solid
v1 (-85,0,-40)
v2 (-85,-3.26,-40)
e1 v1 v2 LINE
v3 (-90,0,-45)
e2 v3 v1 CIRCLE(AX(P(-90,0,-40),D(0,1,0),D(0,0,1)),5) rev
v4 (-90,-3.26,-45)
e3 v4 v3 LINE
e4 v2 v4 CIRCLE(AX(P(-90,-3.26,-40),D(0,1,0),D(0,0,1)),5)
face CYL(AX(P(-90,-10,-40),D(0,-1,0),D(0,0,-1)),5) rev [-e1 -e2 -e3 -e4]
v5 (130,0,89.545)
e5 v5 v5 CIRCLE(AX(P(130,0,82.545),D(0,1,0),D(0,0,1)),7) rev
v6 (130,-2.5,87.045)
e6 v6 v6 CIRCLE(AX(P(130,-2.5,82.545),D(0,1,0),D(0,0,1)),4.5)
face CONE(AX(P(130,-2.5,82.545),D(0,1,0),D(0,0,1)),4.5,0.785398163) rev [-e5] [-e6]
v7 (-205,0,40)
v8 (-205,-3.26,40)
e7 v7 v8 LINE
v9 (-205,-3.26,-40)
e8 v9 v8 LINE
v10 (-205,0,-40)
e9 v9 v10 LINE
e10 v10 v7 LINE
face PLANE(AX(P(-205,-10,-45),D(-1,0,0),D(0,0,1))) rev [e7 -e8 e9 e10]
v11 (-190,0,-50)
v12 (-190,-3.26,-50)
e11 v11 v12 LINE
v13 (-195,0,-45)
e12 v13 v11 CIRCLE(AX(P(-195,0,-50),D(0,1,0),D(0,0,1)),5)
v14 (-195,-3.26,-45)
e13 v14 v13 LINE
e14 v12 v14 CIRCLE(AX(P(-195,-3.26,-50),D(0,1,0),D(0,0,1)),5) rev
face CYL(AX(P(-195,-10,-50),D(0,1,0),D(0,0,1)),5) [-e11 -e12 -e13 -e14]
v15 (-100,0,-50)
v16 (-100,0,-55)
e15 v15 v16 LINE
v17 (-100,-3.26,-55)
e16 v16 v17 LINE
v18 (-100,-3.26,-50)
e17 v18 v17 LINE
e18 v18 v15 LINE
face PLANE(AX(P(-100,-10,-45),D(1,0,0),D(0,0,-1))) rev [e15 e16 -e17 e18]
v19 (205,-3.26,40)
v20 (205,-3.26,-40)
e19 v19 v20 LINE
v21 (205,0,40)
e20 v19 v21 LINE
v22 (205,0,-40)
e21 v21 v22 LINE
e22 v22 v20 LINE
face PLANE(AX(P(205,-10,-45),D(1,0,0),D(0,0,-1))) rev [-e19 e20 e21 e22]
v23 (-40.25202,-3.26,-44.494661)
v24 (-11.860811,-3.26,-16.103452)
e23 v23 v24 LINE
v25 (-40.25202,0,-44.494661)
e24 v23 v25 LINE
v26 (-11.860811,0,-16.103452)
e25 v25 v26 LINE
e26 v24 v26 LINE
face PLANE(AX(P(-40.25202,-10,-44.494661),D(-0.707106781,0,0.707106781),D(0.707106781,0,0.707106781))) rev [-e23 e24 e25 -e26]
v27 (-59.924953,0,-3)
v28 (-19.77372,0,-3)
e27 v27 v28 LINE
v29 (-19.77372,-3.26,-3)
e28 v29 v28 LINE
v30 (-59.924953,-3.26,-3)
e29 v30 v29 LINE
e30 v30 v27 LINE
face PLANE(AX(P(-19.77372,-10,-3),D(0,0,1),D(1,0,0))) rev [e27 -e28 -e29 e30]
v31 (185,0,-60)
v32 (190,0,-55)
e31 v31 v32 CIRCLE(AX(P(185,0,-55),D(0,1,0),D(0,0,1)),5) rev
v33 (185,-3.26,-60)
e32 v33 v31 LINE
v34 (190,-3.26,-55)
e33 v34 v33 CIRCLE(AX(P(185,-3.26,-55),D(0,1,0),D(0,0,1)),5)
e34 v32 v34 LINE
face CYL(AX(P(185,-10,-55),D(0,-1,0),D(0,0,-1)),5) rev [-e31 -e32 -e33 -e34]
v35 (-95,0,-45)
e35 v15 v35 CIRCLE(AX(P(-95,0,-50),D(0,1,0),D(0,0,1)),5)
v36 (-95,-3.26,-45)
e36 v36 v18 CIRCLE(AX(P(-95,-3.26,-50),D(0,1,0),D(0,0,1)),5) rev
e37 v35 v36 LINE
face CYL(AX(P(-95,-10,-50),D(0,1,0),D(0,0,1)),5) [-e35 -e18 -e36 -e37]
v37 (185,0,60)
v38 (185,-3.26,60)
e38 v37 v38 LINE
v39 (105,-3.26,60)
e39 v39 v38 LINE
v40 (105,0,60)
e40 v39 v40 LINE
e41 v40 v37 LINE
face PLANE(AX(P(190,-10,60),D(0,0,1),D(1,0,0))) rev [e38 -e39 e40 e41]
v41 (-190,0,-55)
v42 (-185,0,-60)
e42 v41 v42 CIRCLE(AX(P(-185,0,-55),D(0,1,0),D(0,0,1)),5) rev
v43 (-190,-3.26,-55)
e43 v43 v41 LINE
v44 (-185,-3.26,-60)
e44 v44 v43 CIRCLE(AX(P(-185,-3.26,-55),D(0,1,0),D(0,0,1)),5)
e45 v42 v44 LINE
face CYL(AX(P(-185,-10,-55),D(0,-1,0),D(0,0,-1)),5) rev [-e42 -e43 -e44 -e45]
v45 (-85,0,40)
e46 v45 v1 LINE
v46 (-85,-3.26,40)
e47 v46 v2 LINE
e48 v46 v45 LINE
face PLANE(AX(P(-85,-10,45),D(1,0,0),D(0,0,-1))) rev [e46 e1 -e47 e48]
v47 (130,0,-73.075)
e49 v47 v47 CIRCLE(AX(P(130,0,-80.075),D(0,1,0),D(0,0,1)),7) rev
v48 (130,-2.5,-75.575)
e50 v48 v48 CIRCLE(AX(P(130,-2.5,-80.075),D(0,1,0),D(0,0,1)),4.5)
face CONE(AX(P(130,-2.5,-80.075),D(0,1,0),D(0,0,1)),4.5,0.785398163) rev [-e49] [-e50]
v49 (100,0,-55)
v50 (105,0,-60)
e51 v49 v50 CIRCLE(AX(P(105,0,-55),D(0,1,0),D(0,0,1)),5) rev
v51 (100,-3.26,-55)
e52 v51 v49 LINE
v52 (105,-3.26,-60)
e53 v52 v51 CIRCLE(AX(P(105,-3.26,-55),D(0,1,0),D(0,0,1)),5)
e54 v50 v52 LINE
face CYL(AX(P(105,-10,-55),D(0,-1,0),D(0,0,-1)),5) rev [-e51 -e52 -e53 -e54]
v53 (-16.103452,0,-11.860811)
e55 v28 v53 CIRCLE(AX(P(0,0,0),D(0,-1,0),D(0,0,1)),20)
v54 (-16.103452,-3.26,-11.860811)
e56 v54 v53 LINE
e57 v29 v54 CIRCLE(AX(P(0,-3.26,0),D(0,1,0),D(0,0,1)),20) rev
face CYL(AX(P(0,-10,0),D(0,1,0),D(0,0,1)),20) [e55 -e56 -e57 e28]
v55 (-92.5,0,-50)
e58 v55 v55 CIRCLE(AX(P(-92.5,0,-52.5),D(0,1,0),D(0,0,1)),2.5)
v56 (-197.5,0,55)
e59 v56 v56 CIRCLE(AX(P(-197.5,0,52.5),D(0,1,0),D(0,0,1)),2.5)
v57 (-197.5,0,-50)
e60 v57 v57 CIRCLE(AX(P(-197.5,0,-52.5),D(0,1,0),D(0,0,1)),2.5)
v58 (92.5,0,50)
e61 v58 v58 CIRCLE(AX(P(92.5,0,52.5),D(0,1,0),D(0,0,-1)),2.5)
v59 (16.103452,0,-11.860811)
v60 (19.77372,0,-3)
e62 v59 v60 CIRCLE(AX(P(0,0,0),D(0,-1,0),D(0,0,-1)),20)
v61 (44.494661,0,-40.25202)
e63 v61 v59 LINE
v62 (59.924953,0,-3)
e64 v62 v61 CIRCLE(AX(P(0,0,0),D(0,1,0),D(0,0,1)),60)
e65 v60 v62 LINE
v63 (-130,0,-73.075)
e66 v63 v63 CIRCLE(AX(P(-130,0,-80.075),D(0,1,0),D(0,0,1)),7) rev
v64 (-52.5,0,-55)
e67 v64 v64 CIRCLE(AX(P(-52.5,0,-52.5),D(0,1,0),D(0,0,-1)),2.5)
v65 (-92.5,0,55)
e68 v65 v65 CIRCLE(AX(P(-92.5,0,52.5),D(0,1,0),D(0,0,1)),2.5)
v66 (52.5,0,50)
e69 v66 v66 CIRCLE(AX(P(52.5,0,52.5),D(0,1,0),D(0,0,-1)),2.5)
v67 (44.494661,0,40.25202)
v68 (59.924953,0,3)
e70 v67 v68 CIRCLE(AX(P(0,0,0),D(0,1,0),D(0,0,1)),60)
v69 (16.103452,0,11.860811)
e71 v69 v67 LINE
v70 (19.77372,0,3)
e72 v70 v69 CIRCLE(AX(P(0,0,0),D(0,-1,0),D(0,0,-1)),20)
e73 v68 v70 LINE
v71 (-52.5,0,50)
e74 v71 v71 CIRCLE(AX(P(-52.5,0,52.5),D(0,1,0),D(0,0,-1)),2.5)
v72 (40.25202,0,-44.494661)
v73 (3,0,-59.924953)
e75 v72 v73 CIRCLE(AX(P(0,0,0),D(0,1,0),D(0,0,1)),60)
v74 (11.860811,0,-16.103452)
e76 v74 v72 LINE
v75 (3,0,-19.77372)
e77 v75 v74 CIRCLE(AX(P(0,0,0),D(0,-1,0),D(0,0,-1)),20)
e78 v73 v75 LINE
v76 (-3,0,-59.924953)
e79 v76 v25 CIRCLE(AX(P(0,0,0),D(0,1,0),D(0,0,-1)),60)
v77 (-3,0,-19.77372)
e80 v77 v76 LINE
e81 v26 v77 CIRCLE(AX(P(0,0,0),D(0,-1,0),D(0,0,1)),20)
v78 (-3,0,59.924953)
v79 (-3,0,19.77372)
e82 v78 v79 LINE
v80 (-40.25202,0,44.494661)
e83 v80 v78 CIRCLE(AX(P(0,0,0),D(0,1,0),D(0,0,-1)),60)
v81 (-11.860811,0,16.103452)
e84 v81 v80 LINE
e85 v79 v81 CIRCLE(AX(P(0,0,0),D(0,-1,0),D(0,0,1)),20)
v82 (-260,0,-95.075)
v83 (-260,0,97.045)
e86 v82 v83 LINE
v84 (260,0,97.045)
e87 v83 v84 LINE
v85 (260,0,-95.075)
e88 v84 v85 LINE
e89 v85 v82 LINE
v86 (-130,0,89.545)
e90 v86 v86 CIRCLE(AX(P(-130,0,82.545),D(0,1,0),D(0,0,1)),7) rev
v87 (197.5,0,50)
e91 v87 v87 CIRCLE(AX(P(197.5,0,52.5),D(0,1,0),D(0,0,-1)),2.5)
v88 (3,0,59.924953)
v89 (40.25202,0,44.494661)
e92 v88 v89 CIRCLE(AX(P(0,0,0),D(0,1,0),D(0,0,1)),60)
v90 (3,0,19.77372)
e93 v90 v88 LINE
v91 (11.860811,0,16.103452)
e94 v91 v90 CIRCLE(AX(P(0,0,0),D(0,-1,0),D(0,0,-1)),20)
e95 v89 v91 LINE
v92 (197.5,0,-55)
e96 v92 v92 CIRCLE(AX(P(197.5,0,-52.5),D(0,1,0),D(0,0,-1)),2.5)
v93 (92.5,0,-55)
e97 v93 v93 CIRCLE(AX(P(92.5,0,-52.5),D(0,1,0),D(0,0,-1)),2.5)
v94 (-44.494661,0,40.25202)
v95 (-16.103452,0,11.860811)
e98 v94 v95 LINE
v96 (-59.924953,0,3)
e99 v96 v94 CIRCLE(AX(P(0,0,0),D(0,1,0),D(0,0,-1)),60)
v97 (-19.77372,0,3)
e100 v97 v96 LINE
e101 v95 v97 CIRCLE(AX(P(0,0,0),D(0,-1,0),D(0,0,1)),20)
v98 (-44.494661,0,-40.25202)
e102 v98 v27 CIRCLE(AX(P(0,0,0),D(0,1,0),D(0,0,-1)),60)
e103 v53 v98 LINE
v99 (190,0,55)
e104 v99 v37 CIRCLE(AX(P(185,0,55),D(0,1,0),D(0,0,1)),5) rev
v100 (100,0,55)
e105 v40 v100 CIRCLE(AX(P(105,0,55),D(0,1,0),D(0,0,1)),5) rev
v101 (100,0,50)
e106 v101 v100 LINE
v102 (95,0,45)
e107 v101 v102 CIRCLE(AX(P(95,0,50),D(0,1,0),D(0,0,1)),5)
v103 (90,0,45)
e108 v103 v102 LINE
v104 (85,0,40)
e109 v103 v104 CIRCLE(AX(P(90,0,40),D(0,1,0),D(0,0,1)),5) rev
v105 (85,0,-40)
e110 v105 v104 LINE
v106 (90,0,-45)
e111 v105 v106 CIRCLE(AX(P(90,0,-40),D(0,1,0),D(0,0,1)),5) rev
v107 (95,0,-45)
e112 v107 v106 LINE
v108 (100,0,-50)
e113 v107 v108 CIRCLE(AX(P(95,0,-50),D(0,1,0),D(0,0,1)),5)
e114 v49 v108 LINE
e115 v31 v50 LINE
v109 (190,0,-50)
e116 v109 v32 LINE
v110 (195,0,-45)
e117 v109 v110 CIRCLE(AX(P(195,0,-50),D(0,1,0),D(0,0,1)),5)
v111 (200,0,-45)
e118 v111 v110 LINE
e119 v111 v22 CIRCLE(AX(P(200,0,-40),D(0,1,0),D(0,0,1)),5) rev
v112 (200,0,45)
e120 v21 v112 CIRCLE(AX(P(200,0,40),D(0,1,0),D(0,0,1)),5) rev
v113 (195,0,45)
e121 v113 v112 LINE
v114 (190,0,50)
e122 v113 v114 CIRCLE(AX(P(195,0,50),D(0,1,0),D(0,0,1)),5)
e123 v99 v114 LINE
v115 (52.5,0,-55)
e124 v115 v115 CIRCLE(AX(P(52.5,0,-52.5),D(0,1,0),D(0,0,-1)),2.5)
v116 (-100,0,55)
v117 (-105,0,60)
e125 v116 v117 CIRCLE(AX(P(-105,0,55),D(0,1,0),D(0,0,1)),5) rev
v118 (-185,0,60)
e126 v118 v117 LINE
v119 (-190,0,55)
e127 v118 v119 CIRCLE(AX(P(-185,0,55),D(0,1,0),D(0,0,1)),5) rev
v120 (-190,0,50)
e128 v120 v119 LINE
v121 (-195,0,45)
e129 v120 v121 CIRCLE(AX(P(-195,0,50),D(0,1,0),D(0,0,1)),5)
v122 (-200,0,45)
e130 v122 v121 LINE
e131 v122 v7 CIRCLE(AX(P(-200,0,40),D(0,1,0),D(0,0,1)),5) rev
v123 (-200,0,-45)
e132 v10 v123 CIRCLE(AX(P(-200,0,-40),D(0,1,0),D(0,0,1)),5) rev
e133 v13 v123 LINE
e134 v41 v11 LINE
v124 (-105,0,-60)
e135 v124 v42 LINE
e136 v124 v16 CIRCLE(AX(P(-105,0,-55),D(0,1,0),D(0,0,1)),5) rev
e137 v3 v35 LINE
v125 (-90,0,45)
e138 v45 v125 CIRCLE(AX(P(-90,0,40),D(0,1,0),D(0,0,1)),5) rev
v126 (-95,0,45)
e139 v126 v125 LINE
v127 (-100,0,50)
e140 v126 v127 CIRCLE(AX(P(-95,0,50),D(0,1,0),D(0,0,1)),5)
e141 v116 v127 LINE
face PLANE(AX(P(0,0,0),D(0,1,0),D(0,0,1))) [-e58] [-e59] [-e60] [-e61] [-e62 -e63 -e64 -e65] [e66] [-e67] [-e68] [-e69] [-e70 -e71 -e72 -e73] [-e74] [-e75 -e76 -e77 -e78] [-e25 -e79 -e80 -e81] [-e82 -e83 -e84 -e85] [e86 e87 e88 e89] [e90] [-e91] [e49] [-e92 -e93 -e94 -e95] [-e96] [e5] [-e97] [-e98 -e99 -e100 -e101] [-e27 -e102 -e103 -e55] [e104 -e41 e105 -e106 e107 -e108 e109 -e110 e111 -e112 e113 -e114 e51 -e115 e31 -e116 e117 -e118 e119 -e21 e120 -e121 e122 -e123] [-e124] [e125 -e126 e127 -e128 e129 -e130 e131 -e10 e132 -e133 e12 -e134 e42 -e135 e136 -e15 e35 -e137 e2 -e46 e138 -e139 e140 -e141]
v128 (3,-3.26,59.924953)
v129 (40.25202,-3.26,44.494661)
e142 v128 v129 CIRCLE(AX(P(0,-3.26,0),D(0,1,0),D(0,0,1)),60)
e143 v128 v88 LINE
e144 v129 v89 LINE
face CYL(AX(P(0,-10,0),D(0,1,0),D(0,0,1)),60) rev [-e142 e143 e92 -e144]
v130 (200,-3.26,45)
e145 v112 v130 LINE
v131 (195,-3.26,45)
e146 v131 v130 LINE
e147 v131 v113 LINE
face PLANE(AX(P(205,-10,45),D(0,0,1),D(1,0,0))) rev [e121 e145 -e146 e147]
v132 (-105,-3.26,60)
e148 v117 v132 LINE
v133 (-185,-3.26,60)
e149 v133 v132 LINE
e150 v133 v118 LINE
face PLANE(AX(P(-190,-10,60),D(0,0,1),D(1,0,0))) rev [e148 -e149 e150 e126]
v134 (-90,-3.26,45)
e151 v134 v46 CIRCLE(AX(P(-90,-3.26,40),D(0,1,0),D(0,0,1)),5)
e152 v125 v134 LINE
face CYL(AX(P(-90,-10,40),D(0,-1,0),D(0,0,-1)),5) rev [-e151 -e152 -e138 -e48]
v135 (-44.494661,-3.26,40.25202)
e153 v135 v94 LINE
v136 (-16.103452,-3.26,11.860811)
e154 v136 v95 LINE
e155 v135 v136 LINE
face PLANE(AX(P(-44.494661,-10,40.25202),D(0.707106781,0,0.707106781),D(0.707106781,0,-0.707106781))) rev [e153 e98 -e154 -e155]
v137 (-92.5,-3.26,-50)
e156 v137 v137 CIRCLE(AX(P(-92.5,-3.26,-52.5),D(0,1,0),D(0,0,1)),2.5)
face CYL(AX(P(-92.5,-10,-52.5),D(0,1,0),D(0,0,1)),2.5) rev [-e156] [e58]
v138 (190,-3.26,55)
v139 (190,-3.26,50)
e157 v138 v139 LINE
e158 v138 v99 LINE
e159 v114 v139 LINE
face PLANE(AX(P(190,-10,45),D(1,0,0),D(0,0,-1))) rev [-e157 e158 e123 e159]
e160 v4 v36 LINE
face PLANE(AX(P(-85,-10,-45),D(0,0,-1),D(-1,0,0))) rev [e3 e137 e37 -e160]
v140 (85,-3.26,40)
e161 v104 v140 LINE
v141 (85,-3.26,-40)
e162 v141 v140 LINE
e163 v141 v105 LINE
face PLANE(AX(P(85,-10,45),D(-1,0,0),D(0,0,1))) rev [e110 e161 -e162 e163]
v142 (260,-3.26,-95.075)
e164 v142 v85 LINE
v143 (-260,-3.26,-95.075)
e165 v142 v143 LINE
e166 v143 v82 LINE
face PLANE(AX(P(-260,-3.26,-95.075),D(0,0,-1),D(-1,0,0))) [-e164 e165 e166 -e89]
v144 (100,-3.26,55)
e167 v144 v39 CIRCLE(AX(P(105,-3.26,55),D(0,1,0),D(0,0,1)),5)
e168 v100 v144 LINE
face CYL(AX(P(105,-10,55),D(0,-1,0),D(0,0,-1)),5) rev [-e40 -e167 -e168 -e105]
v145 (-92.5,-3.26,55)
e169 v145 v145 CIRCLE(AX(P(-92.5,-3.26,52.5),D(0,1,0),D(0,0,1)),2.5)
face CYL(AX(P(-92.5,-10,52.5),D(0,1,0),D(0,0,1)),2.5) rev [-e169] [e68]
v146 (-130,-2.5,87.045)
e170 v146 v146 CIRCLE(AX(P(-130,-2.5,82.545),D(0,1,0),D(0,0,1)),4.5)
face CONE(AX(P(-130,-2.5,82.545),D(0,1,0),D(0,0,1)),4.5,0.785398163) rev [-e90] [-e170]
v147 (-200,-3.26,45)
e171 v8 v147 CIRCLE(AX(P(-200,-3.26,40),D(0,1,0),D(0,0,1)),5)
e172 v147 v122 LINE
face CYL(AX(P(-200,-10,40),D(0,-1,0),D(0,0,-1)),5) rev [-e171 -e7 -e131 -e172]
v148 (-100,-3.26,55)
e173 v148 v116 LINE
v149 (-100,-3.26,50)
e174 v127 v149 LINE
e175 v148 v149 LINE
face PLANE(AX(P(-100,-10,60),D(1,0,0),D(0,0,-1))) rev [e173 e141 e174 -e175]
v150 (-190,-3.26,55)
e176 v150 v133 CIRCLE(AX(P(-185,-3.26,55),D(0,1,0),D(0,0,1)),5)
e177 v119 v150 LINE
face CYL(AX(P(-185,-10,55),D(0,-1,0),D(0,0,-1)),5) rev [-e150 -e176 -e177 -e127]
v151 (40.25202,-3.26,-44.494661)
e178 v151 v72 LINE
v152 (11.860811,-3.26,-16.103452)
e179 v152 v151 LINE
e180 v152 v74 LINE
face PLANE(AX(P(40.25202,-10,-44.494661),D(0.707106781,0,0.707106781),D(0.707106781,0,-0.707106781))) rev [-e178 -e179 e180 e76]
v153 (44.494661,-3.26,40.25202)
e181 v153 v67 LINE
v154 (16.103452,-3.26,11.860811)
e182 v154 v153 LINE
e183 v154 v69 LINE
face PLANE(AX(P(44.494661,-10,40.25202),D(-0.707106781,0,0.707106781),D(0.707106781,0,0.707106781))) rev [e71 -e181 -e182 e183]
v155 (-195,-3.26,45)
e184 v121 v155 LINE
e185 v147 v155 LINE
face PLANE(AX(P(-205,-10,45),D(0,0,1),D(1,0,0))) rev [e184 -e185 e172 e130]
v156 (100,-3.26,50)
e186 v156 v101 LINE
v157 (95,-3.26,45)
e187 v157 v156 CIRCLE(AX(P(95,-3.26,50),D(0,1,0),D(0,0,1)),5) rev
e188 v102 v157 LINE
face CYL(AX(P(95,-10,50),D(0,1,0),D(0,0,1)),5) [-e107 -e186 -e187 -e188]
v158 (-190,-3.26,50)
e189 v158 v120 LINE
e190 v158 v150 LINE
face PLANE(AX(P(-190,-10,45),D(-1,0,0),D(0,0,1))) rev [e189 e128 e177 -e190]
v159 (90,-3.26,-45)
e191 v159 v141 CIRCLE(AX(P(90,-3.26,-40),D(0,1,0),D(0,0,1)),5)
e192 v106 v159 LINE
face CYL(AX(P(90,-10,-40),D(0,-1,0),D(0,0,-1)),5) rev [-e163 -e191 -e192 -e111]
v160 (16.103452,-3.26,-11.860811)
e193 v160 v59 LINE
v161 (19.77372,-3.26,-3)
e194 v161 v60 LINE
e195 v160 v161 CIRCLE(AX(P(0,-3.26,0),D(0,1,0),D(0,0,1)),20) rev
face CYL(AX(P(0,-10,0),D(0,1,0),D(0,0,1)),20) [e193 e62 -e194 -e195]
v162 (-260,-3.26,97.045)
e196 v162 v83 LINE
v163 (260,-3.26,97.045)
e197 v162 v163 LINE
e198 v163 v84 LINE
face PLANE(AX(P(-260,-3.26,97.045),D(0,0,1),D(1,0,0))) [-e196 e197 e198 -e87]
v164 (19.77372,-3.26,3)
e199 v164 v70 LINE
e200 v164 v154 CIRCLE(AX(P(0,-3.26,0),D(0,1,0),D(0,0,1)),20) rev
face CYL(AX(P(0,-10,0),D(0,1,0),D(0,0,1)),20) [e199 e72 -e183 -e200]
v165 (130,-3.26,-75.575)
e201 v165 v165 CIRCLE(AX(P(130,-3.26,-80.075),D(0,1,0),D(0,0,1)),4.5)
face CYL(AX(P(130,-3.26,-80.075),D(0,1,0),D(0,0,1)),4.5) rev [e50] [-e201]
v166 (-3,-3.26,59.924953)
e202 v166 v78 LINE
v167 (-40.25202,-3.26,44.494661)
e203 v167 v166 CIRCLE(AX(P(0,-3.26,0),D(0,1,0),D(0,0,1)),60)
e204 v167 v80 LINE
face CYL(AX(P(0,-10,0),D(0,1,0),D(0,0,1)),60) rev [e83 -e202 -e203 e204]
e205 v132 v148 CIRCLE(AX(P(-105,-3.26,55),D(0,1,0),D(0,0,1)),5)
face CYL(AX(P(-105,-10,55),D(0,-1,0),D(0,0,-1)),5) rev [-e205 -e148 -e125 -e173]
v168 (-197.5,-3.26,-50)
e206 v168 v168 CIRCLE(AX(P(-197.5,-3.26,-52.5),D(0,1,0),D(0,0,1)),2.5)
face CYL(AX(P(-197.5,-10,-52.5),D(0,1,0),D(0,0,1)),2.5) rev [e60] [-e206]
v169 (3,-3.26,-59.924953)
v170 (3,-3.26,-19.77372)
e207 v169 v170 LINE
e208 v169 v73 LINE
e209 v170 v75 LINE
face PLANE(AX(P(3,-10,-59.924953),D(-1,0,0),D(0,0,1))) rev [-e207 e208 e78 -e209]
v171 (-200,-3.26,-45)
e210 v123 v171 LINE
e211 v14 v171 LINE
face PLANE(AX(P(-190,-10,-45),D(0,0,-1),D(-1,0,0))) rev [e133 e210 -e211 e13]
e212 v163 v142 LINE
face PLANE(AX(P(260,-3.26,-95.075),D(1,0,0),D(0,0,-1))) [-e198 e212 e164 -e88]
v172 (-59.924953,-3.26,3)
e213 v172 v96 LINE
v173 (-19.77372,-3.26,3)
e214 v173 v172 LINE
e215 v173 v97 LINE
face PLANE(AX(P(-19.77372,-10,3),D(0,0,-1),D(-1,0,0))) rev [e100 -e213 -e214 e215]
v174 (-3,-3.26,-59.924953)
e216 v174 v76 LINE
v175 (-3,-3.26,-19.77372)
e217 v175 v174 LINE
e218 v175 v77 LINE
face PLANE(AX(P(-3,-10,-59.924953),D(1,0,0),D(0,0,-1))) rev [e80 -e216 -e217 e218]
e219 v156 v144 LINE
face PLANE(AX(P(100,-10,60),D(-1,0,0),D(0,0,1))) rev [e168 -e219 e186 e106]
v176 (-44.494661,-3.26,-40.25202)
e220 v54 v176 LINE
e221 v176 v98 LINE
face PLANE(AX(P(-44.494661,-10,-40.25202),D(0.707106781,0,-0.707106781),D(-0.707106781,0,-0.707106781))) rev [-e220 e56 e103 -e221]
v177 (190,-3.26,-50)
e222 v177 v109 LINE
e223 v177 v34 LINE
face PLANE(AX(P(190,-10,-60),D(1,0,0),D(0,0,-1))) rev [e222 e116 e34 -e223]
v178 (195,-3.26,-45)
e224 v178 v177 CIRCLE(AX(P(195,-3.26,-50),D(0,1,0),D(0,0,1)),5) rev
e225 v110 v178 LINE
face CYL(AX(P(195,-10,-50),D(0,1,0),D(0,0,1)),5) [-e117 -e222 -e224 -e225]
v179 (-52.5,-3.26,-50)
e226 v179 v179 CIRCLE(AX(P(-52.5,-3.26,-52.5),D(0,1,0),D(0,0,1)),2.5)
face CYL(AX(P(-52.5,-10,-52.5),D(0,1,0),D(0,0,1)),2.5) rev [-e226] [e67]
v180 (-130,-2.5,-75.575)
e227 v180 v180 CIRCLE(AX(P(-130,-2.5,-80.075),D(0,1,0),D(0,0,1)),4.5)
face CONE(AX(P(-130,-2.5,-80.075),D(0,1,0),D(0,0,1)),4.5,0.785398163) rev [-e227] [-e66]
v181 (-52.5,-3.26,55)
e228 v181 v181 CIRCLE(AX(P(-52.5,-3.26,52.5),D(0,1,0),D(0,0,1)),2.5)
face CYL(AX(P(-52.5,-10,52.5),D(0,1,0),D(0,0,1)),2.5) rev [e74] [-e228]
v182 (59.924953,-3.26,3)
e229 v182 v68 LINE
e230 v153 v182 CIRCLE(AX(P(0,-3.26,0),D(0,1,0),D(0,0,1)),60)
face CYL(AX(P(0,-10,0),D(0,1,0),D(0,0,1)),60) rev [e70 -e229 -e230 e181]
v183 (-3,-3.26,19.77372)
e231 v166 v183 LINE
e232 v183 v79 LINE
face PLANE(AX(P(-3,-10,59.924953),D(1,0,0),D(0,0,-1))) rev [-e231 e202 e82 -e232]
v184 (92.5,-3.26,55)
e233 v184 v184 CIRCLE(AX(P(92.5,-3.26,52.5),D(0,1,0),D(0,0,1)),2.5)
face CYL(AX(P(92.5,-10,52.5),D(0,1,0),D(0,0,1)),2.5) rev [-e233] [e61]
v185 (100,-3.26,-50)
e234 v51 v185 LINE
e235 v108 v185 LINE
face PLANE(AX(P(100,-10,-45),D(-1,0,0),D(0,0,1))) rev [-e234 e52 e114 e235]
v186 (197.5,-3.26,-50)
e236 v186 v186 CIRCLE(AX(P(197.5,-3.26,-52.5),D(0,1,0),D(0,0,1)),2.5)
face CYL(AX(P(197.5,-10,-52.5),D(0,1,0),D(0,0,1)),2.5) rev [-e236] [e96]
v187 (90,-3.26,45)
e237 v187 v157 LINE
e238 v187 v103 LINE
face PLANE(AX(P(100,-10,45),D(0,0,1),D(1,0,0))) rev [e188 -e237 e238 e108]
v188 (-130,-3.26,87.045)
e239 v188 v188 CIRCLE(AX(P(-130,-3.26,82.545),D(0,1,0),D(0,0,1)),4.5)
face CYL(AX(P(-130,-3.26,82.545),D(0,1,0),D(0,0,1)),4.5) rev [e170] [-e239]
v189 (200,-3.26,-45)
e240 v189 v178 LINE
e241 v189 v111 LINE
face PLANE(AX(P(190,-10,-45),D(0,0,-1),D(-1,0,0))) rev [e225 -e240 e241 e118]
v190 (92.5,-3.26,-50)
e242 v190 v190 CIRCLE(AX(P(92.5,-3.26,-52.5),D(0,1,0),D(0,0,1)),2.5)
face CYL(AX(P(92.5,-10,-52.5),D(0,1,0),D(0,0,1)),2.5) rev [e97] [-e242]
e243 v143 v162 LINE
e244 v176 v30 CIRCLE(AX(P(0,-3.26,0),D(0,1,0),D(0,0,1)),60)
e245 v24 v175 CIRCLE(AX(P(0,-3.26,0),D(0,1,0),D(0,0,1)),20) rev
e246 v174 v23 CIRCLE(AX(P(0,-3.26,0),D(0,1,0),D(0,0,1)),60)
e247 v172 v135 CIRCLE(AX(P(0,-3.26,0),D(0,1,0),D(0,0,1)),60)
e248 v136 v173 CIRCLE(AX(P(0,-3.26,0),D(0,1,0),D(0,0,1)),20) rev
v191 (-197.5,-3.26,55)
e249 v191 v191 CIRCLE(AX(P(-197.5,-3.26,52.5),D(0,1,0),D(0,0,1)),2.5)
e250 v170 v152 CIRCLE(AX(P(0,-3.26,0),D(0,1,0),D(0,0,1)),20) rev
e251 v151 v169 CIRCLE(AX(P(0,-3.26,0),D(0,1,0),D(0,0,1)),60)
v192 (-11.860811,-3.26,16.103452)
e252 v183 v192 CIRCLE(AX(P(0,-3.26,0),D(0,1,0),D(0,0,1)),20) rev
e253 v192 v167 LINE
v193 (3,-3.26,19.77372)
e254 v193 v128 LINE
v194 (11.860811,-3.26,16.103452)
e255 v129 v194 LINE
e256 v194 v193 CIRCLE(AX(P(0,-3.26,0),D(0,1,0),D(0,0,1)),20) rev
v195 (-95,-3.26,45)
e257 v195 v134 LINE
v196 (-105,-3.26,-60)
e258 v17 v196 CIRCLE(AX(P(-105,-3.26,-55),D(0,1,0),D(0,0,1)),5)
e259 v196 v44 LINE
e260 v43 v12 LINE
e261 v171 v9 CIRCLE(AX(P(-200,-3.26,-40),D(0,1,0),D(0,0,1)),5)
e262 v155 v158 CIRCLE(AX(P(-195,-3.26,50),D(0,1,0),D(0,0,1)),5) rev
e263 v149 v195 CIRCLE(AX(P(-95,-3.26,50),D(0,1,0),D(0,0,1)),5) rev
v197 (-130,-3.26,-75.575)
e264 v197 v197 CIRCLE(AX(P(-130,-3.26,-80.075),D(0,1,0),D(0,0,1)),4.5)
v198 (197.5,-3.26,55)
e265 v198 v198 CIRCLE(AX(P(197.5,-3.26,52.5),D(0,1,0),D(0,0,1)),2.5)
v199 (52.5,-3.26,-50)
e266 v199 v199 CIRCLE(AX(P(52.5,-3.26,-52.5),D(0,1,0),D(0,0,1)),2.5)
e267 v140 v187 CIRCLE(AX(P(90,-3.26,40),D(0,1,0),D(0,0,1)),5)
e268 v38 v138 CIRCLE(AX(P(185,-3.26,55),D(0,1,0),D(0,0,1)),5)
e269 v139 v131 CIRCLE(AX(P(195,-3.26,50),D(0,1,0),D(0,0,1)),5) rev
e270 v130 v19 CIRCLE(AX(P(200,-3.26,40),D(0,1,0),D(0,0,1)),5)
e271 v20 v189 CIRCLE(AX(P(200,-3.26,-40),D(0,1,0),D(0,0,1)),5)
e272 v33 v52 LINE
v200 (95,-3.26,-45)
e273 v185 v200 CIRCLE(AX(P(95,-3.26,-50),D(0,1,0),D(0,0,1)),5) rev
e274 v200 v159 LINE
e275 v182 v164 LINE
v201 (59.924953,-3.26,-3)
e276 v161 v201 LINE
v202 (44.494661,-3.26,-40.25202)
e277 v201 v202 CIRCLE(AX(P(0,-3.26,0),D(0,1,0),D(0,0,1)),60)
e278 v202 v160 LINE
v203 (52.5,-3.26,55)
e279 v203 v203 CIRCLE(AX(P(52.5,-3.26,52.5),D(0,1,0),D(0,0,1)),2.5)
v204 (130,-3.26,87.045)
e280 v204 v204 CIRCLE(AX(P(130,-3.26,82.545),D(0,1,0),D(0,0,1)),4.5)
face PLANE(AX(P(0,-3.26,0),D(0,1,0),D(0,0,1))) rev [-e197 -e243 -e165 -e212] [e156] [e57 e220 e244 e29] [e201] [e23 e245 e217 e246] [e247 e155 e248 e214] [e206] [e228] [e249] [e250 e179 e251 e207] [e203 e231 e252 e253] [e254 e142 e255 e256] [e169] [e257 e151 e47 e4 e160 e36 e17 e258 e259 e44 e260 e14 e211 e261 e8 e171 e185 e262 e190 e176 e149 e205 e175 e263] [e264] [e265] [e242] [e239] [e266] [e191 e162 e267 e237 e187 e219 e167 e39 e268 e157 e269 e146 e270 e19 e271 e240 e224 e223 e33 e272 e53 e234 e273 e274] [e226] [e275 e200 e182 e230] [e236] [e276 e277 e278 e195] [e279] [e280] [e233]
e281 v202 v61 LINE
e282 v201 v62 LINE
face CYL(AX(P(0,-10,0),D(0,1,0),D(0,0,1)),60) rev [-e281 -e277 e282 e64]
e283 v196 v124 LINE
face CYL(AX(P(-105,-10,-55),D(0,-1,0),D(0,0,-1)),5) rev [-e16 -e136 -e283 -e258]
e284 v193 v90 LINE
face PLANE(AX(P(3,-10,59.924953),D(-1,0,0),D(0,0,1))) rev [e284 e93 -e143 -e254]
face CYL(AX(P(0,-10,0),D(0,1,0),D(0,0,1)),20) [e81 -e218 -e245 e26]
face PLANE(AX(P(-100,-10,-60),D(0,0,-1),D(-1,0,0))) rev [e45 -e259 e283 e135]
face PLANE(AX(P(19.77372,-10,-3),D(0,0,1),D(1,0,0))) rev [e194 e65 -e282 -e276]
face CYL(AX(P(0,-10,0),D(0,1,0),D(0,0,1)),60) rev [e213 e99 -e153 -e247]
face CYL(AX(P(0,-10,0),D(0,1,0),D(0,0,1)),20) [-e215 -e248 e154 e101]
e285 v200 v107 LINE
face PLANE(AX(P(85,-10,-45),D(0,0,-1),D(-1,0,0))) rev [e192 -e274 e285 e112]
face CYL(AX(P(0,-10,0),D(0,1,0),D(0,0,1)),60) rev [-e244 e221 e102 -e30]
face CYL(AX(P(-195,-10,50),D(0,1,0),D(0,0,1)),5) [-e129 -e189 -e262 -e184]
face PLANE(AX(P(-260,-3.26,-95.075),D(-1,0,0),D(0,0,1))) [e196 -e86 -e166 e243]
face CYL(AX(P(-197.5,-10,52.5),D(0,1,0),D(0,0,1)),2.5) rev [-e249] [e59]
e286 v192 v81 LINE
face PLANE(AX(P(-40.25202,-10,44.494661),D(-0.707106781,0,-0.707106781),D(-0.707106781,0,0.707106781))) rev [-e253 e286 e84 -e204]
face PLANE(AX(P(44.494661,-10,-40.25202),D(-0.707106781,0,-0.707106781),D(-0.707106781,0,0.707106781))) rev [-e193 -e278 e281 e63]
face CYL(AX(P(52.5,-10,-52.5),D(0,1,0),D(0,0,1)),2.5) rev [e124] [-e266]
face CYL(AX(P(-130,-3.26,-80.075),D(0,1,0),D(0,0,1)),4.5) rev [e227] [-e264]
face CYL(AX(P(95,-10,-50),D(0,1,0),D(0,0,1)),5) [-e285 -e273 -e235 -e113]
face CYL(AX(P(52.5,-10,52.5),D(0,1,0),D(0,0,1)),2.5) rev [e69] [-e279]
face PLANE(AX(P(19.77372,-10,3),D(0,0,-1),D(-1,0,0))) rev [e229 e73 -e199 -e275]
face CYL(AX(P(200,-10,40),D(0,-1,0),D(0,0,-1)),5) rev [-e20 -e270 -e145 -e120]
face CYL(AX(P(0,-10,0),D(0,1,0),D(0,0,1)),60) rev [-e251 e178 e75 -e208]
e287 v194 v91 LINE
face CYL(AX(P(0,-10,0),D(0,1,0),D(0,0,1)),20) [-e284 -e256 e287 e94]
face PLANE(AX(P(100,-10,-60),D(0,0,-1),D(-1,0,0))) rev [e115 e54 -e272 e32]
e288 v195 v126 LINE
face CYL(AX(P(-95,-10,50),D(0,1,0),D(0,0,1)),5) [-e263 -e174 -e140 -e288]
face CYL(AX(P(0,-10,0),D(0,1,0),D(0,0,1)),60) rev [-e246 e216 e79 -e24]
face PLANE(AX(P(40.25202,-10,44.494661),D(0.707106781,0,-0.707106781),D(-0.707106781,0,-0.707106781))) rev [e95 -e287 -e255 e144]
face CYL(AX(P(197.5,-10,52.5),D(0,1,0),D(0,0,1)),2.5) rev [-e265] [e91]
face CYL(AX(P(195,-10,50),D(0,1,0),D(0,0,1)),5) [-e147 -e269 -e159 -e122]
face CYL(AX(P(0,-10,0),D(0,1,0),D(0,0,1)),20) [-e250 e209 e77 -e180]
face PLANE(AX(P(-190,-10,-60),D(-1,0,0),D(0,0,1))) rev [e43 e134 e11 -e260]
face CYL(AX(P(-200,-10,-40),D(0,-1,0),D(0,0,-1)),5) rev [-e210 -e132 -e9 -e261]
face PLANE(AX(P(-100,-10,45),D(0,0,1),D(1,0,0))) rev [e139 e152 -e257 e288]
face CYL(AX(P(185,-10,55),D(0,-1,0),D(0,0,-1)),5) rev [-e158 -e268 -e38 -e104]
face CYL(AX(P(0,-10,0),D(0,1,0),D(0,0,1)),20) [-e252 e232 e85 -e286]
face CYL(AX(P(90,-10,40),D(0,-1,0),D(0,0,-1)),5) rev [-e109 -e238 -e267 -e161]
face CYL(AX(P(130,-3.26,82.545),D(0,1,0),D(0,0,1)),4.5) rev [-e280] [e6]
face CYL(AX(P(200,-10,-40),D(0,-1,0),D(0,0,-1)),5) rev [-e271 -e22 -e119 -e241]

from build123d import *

# Parameters (mm, degrees)
SKETCH1_W          = 520
SKETCH1_H          = 192.12
BASE_FLANGE1_DEPTH = 3.26
SKETCH2_R          = 4.5
CUT_EXTRUDE1_DEPTH = 10
SKETCH3_R          = 2.5
CUT_EXTRUDE2_DEPTH = 10
SKETCH4_R          = 2.5
CUT_EXTRUDE3_DEPTH = 10
FILLET2_R          = 5
CHAMFER1_SIZE      = 2.5


# Sheet-metal steps are written as plain solids
with BuildPart() as part:
    # Sketch1 → Base-Flange1 (new body)
    with BuildSketch(Plane(origin=(0, 0, 0), x_dir=(1, 0, 0), z_dir=(0, 1, 0))):
        with Locations((0, -0.985)):
            Rectangle(SKETCH1_W, SKETCH1_H)
    extrude(amount=-BASE_FLANGE1_DEPTH)

    # Sketch2 → Cut-Extrude1 (cut)
    with BuildSketch(Plane(origin=(0, 0, 0), x_dir=(1, 0, 0), z_dir=(0, 1, 0))):
        with Locations(Location((130, 80.075, 0), (0, 0, 270))):
            Circle(SKETCH2_R)
        with Locations(Location((130, -82.545, 0), (0, 0, 270))):
            Circle(SKETCH2_R)
        with Locations(Location((-130, 80.075, 0), (0, 0, 270))):
            Circle(SKETCH2_R)
        with Locations(Location((-130, -82.545, 0), (0, 0, 270))):
            Circle(SKETCH2_R)
    extrude(amount=-CUT_EXTRUDE1_DEPTH, mode=Mode.SUBTRACT)

    # Sketch3 → Cut-Extrude2 (cut)
    with BuildSketch(Plane(origin=(0, 0, 0), x_dir=(1, 0, 0), z_dir=(0, 1, 0))):
        with Locations(Location((-52.5, 52.5, 0), (0, 0, 270))):
            Circle(SKETCH3_R)
        with Locations(Location((52.5, 52.5, 0), (0, 0, 270))):
            Circle(SKETCH3_R)
        with Locations(Location((52.5, -52.5, 0), (0, 0, 270))):
            Circle(SKETCH3_R)
        with Locations(Location((-52.5, -52.5, 0), (0, 0, 270))):
            Circle(SKETCH3_R)
        with BuildLine():
            Line((-3, -59.924953066), (-3, -19.773719933))
            ThreePointArc((-3, -19.773719933), (-7.653668647, -18.47759065), (-11.860811111, -16.103451798))
            Line((-11.860811111, -16.103451798), (-40.252020332, -44.494661019))
            ThreePointArc((-40.252020332, -44.494661019), (-22.961005942, -55.432771951), (-3, -59.924953066))
        make_face()
        with BuildLine():
            Line((-3, 59.924953066), (-3, 19.773719933))
            ThreePointArc((-3, 19.773719933), (-7.653668647, 18.47759065), (-11.860811111, 16.103451798))
            Line((-11.860811111, 16.103451798), (-40.252020332, 44.494661019))
            ThreePointArc((-40.252020332, 44.494661019), (-22.961005942, 55.432771951), (-3, 59.924953066))
        make_face()
        with BuildLine():
            Line((-19.773719933, 3), (-59.924953066, 3))
            ThreePointArc((-59.924953066, 3), (-55.432771951, 22.961005942), (-44.494661019, 40.252020332))
            Line((-44.494661019, 40.252020332), (-16.103451798, 11.860811111))
            ThreePointArc((-16.103451798, 11.860811111), (-18.47759065, 7.653668647), (-19.773719933, 3))
        make_face()
        with BuildLine():
            Line((-19.773719933, -3), (-59.924953066, -3))
            ThreePointArc((-59.924953066, -3), (-55.432771951, -22.961005942), (-44.494661019, -40.252020332))
            Line((-44.494661019, -40.252020332), (-16.103451798, -11.860811111))
            ThreePointArc((-16.103451798, -11.860811111), (-18.47759065, -7.653668647), (-19.773719933, -3))
        make_face()
        with BuildLine():
            Line((3, -59.924953066), (3, -19.773719933))
            ThreePointArc((3, -19.773719933), (7.653668647, -18.47759065), (11.860811111, -16.103451798))
            Line((11.860811111, -16.103451798), (40.252020332, -44.494661019))
            ThreePointArc((40.252020332, -44.494661019), (22.961005942, -55.432771951), (3, -59.924953066))
        make_face()
        with BuildLine():
            Line((44.494661019, -40.252020332), (16.103451798, -11.860811111))
            ThreePointArc((16.103451798, -11.860811111), (18.47759065, -7.653668647), (19.773719933, -3))
            Line((19.773719933, -3), (59.924953066, -3))
            ThreePointArc((59.924953066, -3), (55.432771951, -22.961005942), (44.494661019, -40.252020332))
        make_face()
        with BuildLine():
            Line((19.773719933, 3), (59.924953066, 3))
            ThreePointArc((59.924953066, 3), (55.432771951, 22.961005942), (44.494661019, 40.252020332))
            Line((44.494661019, 40.252020332), (16.103451798, 11.860811111))
            ThreePointArc((16.103451798, 11.860811111), (18.47759065, 7.653668647), (19.773719933, 3))
        make_face()
        with BuildLine():
            Line((40.252020332, 44.494661019), (11.860811111, 16.103451798))
            ThreePointArc((11.860811111, 16.103451798), (7.653668647, 18.47759065), (3, 19.773719933))
            Line((3, 19.773719933), (3, 59.924953066))
            ThreePointArc((3, 59.924953066), (22.961005942, 55.432771951), (40.252020332, 44.494661019))
        make_face()
    extrude(amount=-CUT_EXTRUDE2_DEPTH, mode=Mode.SUBTRACT)

    # Sketch4 → Cut-Extrude3 (cut)
    with BuildSketch(Plane(origin=(0, 0, 0), x_dir=(1, 0, 0), z_dir=(0, 1, 0))):
        with Locations(Location((-92.5, 52.5, 0), (0, 0, 270))):
            Circle(SKETCH4_R)
        with Locations(Location((-197.5, 52.5, 0), (0, 0, 270))):
            Circle(SKETCH4_R)
        with Locations(Location((-197.5, -52.5, 0), (0, 0, 270))):
            Circle(SKETCH4_R)
        with Locations(Location((-92.5, -52.5, 0), (0, 0, 270))):
            Circle(SKETCH4_R)
        with Locations(Location((92.5, -52.5, 0), (0, 0, 270))):
            Circle(SKETCH4_R)
        with Locations(Location((197.5, -52.5, 0), (0, 0, 270))):
            Circle(SKETCH4_R)
        with Locations(Location((197.5, 52.5, 0), (0, 0, 270))):
            Circle(SKETCH4_R)
        with Locations(Location((92.5, 52.5, 0), (0, 0, 270))):
            Circle(SKETCH4_R)
        Polygon((-100, 60), (-190, 60), (-190, 45), (-205, 45), (-205, -45), (-190, -45), (-190, -60), (-100, -60), (-100, -45), (-85, -45), (-85, 45), (-100, 45), align=None)
        Polygon((100, 45), (100, 60), (190, 60), (190, 45), (205, 45), (205, -45), (190, -45), (190, -60), (100, -60), (100, -45), (85, -45), (85, 45), align=None)
    extrude(amount=-CUT_EXTRUDE3_DEPTH, mode=Mode.SUBTRACT)

    # Fillet2
    fillet2_edges = [part.edges().sort_by_distance(p)[0] for p in [
        (-100, -1.63, -60),
        (-100, -1.63, -45),
        (-85, -1.63, -45),
        (-85, -1.63, 45),
        (-100, -1.63, 45),
        (-100, -1.63, 60),
        (-190, -1.63, 60),
        (-190, -1.63, 45),
        (-205, -1.63, 45),
        (-205, -1.63, -45),
        (-190, -1.63, -45),
        (-190, -1.63, -60),
        (85, -1.63, -45),
        (100, -1.63, -45),
        (100, -1.63, -60),
        (190, -1.63, -60),
        (190, -1.63, -45),
        (205, -1.63, -45),
        (205, -1.63, 45),
        (190, -1.63, 45),
        (190, -1.63, 60),
        (100, -1.63, 60),
        (100, -1.63, 45),
        (85, -1.63, 45),
    ]]
    fillet(fillet2_edges, radius=FILLET2_R)

    # Chamfer1
    chamfer1_edges = [part.edges().sort_by_distance(p)[0] for p in [
        (130, 0, -84.575),
        (130, 0, 78.045),
        (-130, 0, -84.575),
        (-130, 0, 78.045),
    ]]
    chamfer(chamfer1_edges, length=CHAMFER1_SIZE)


solid = part.part
